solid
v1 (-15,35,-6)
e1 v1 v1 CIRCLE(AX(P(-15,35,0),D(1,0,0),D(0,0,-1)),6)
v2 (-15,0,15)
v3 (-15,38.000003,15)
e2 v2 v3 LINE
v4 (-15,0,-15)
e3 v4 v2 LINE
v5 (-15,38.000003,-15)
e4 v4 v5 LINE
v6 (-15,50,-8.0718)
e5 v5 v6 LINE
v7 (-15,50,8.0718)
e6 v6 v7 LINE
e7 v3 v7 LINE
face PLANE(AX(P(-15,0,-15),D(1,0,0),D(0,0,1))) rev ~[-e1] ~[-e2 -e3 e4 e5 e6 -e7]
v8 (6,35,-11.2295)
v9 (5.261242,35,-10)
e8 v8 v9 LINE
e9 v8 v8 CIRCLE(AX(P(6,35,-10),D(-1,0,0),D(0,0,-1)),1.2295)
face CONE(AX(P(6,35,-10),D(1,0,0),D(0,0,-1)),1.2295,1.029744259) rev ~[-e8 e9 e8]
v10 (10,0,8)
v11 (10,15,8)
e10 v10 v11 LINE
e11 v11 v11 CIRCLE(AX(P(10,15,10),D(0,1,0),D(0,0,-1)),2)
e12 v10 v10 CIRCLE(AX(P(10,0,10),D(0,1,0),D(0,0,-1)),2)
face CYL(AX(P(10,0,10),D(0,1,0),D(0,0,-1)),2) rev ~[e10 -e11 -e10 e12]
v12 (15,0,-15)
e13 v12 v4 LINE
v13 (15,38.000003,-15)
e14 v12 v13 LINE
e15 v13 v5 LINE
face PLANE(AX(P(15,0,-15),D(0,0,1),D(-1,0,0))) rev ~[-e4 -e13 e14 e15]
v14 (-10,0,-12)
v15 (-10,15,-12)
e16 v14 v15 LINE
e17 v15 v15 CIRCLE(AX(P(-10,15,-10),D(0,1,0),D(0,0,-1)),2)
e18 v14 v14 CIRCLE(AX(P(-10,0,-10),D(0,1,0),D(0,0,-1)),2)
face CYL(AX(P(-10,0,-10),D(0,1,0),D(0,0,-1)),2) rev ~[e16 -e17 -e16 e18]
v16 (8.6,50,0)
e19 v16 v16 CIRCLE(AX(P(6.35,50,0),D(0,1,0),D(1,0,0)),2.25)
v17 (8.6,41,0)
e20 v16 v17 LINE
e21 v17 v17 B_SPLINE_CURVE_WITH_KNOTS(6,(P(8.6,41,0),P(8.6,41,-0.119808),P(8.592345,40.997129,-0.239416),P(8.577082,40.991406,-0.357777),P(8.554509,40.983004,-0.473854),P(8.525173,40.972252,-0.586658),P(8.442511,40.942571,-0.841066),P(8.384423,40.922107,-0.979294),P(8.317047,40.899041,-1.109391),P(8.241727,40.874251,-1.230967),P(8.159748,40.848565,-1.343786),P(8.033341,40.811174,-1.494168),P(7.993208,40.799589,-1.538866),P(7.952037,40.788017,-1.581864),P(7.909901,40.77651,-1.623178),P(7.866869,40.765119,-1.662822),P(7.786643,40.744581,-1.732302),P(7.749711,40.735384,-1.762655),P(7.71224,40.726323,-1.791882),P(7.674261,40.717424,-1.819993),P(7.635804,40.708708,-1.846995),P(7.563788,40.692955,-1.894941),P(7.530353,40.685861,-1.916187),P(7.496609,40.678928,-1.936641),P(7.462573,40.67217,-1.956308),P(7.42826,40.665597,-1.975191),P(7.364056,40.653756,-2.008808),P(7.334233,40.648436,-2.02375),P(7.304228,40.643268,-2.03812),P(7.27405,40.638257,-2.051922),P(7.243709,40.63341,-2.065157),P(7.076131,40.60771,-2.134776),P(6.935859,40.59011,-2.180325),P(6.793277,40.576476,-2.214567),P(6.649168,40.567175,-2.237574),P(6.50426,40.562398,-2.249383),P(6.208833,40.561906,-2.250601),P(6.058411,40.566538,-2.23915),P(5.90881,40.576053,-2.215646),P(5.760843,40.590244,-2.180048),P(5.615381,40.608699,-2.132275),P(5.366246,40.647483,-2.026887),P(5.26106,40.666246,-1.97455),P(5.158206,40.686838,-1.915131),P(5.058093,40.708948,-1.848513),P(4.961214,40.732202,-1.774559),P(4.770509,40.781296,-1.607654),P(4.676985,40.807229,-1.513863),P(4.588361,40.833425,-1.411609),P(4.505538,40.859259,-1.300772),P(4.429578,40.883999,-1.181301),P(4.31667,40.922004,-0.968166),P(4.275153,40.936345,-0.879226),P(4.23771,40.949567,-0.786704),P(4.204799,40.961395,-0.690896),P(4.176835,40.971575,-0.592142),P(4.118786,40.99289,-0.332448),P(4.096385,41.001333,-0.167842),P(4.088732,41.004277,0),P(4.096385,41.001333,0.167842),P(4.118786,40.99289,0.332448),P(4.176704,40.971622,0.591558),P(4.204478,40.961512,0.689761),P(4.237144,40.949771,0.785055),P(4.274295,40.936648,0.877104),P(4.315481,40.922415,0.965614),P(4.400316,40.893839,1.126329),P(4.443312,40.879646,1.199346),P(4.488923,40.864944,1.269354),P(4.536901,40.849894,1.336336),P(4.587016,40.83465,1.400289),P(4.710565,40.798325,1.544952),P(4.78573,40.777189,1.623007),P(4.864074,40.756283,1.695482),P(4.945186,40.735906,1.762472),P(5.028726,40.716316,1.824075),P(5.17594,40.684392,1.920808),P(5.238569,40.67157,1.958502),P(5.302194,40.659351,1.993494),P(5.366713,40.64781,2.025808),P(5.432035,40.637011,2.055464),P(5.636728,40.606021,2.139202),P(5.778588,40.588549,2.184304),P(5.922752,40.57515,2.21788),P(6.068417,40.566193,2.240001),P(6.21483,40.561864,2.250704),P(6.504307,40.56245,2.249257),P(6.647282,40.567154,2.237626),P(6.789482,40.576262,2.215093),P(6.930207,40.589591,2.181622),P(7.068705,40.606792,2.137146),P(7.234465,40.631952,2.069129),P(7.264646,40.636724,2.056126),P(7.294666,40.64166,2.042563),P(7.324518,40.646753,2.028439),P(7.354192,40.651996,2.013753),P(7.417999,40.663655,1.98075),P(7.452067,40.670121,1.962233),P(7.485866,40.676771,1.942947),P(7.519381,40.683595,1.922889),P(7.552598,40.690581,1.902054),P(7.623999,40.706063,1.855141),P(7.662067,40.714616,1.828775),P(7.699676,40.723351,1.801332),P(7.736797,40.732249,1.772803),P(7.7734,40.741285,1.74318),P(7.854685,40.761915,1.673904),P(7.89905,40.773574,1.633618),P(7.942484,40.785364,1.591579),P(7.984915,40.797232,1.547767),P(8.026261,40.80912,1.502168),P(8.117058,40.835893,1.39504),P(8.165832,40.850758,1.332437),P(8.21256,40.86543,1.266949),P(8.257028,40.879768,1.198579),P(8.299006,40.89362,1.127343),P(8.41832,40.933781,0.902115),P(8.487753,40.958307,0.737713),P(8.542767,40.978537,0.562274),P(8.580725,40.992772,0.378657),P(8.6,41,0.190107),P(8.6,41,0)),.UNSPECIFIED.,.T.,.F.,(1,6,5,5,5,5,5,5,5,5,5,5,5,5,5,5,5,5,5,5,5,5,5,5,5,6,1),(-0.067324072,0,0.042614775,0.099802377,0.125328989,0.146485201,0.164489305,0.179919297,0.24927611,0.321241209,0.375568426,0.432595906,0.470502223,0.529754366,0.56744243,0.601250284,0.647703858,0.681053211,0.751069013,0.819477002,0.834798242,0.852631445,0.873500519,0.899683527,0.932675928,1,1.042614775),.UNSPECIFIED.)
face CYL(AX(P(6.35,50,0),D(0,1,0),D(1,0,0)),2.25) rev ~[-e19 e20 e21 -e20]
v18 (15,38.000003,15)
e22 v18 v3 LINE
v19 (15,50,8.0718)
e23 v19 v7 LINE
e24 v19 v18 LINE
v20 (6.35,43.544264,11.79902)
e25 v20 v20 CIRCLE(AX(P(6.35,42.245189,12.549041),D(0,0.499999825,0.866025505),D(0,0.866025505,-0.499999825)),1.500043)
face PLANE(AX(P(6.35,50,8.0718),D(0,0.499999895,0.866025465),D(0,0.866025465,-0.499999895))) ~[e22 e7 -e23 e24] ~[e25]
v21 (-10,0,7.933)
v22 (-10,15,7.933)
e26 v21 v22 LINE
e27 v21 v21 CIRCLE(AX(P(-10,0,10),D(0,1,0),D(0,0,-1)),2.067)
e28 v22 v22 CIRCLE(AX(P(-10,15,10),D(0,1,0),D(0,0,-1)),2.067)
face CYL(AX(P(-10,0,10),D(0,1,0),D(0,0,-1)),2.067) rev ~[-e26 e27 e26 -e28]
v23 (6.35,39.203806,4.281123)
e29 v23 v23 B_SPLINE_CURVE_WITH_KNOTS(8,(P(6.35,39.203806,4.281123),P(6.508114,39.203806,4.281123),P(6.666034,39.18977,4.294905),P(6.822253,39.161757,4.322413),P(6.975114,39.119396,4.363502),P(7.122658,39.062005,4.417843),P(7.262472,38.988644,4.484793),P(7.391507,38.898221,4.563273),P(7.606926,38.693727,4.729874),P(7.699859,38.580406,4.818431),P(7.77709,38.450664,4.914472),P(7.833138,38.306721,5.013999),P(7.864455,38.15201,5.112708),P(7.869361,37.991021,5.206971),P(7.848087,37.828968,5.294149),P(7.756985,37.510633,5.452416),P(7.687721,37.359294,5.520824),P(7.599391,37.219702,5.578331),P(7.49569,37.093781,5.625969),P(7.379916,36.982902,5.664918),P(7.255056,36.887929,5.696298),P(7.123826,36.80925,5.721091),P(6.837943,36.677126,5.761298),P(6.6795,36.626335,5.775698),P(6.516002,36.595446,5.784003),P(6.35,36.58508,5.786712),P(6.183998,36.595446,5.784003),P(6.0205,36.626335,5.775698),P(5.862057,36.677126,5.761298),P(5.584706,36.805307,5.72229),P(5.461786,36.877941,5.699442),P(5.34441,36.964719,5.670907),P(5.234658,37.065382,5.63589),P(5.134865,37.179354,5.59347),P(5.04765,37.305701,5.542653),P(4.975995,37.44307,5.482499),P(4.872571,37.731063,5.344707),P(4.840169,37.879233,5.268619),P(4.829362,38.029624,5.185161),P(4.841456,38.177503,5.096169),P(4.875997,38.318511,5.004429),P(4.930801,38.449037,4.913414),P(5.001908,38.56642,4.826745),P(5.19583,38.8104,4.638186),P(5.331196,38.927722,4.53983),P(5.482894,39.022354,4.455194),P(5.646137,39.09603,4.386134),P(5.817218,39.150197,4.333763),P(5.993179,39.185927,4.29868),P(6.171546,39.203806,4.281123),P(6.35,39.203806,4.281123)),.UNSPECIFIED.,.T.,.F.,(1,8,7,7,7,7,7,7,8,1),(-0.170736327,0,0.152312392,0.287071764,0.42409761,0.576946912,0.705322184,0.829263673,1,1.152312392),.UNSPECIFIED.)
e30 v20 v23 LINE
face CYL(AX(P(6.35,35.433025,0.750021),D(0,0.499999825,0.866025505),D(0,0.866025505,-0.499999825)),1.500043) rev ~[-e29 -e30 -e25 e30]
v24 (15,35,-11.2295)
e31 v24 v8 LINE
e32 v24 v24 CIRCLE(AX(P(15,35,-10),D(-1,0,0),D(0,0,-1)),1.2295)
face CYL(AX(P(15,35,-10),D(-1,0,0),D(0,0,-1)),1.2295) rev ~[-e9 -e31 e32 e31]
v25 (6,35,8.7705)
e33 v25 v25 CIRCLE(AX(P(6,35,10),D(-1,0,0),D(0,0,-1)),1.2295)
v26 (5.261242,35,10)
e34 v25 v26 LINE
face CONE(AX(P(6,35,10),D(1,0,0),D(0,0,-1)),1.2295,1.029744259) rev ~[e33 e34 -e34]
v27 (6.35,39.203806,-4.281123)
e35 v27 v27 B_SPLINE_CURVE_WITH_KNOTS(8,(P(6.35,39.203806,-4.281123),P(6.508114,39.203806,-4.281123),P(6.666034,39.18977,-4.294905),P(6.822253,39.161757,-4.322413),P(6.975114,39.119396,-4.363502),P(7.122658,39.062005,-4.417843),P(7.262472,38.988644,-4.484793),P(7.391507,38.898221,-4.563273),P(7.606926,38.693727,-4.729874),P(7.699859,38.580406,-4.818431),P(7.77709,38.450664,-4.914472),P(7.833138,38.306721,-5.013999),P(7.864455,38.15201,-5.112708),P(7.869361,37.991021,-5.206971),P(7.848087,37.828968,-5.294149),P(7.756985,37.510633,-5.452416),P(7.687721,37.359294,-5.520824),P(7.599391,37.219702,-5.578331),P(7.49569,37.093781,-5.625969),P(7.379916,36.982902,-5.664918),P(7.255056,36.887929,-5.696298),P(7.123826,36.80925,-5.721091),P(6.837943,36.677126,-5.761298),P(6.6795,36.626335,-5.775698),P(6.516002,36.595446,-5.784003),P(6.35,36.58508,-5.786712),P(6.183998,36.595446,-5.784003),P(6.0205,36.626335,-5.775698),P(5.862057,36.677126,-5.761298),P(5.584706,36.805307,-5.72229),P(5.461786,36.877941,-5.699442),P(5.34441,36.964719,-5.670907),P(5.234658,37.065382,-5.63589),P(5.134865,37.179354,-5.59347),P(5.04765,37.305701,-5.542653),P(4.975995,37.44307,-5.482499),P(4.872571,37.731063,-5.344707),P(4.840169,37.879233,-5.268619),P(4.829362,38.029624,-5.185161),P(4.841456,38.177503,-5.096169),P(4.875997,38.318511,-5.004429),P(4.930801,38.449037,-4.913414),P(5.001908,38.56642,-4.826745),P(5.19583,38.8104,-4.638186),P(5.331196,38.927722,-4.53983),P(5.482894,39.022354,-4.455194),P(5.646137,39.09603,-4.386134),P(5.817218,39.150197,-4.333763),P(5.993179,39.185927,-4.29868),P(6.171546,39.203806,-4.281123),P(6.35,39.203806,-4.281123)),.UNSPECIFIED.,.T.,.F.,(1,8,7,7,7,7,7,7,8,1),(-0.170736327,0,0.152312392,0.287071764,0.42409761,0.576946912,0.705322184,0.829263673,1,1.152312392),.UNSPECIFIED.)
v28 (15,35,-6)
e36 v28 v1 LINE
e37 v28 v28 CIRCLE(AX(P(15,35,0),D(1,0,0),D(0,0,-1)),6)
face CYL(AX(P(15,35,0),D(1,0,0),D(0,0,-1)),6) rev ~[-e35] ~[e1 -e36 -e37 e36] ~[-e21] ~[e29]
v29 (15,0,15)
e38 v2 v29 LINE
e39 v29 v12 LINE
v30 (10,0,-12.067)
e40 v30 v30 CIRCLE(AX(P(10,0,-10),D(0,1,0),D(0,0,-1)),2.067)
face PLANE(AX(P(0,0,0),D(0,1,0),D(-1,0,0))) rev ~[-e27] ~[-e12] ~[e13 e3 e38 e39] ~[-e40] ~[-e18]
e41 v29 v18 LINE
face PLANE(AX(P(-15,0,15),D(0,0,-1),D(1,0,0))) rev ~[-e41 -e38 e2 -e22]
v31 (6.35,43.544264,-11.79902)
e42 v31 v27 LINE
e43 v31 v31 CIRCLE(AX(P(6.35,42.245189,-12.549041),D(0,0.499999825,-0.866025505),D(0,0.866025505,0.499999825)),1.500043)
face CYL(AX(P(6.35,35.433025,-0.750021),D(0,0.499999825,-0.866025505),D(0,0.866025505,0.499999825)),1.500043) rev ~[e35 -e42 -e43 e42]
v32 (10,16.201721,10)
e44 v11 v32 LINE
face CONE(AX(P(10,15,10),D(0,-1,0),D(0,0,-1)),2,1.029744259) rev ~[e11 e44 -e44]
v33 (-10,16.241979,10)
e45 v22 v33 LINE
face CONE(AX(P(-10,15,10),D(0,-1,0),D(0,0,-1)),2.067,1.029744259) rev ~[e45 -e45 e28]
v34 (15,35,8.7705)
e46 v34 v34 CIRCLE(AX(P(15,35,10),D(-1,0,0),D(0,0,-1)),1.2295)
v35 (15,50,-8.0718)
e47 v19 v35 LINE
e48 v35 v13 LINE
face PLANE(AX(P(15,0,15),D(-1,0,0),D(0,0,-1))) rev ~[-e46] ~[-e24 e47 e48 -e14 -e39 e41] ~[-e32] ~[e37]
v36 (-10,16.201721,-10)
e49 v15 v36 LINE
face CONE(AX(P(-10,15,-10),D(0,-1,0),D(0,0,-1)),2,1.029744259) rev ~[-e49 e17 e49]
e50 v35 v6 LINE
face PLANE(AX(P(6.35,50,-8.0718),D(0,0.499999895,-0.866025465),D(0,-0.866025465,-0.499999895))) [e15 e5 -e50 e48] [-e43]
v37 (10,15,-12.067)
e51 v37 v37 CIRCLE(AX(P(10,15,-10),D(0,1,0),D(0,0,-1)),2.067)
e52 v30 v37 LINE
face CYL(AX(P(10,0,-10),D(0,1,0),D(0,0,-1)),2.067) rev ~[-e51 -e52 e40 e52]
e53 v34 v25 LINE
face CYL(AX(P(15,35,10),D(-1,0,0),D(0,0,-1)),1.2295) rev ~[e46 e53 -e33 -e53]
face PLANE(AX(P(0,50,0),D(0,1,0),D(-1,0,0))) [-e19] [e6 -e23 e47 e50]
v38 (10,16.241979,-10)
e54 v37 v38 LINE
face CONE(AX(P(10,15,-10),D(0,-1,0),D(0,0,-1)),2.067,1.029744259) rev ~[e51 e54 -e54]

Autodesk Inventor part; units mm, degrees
ref_plane "XZ Plane" through (0, 0, 0) normal (0, 1, 0) x (-1, 0, 0)
ref_plane "XY Plane" through (0, 0, 0) normal (0, 0, 1) x (1, 0, 0)
sketch "Sketch1" plane through (0, 0, 0) normal (0, 1, 0) x (-1, 0, 0)
  line L0 (-15, -15) -> (15, -15)
  line L1 (15, -15) -> (15, 15)
  line L2 (15, 15) -> (-15, 15)
  line L3 (-15, 15) -> (-15, -15)
  line L4 (-15, -15) -> (15, 15) construction
  line L5 (15, -15) -> (-15, 15) construction
  point P0 (0, 0)
  dimension "d0" = 30
  dimension "d1" = 30
extrude "Extrusion1" add sketch "Sketch1" along normal blind 50
sketch "Sketch2" plane through (15, 0, 15) normal (1, 0, 0) x (0, 0, -1)
  line L0 (15, 0) -> (15, 35) construction
  line L1 (0, 0) -> (30, 0) projected
  circle A0 centre (15, 35) radius 6
  dimension "d4" = 35
  dimension "d6" = 12
extrude "Extrusion2" cut sketch "Sketch2" against normal through all
sketch "Sketch7" plane through (0, 50, 0) normal (0, 1, 0) x (1, 0, 0)
  line L0 (15, -15) -> (15, 15) projected
  line L1 (6.5, 0) -> (6.35, 0)
  circle A0 centre (6.35, 0) radius 2.25
  point P0 (0, 0)
  dimension "d33" = 4.5
  dimension "d119" = 8.65
extrude "Extrusion7" cut sketch "Sketch7" against normal blind 12
ref_plane "Work Plane1" through (6.35, 0, 0) normal (1, 0, 0) x (0, 1, 0)
sketch "Sketch14" plane through (6.35, 0, 0) normal (1, 0, 0) x (0, 1, 0)
  line L0 (50, -15) -> (50, 15) projected
  circle A0 centre (35, 0) radius 6 projected
  line L1 (50, 0) -> (35, 0)
  line L2 (35, 0) -> (52.3205, -30)
  line L3 (35, 0) -> (61.673, 0)
  line L4 (35, 0) -> (36.7321, 0)
  line L5 (36.7321, 0) -> (54.0526, -30)
  line L6 (54.0526, -30) -> (52.3205, -30)
  line L7 (52, -6.9171) -> (34.5359, -17)
  line L8 (34.5359, -17) -> (52, -17)
  line L9 (52, -17) -> (52, -6.9171)
  line L10 (0, -15) -> (50, -15) projected
  line L11 (0, -15) -> (50, -15) projected
  point P0 (0, 0)
  point P1 (36.7321, 0)
  point P2 (38, -15)
  dimension "d55" = 60
  dimension "d57" = 120
  dimension "d72" = 1.5
  dimension "d73" = 30
  dimension "d112" = 2
  dimension "d113" = 2
  dimension "d114" = 12
revolve "Revolution1" cut sketch "Sketch14" angle 360 about axis through (6.35, 35, 0) along (0, 0.5, -0.8660254) contours L10 L2 L7 L5 | L5 L8 L2 L10 | L7 L2 A0 L5 | L5 L6 L2 L8 | A0 L2 L1 L5
extrude "Extrusion11" cut sketch "Sketch14" along normal blind 99 and the other way blind 99 contours L10 L5 L7 L0 | L0 L7 L9 L8 L5 L10 | L10 L2 L7 L5 | L5 L8 L2 L10 | L10 L7 L2 | L2 L8 L7 L10
mirror "Mirror4" about plane through (0, 0, 0) normal (0, 0, 1) of "Revolution1", "Extrusion11"
sketch "Sketch19" plane through (0, 0, 0) normal (0, -1, 0) x (1, 0, 0)
  point P0 (0, 0)
  point P1 (-10, 10)
  point P2 (10, -10)
  dimension "d97" = 10
  dimension "d98" = 10
  dimension "d99" = 10
  dimension "d100" = 10
hole "Hole2" at (-10, 0, 10) at (10, 0, -10) direction (0, 1, 0) diameter 4.134 depth 15 tip angle 118 thread size "M5x0.8" class "6H" standard "ISO Metric profile"
sketch "Sketch20" plane through (0, 0, 0) normal (0, -1, 0) x (1, 0, 0)
  point P0 (0, 0)
  point P1 (10, 10)
  point P2 (-10, -10)
  dimension "d108" = 10
  dimension "d109" = 10
  dimension "d110" = 10
  dimension "d111" = 10
hole "Hole3" at (10, 0, 10) at (-10, 0, -10) direction (0, 1, 0) diameter 4 depth 15 tip angle 118
sketch "Sketch21" plane through (15, 0, 15) normal (1, 0, 0) x (0, 0, -1)
  line L0 (0, 0) -> (30, 0) projected
  circle A0 centre (15, 35) radius 6 projected
  point P0 (15, 0)
  point P1 (5, 35)
  point P2 (25, 35)
  point P3 (15, 0)
  point P4 (15, 0)
  dimension "d127" = 10
  dimension "d128" = 10
hole "Hole4" at (15, 35, 10) at (15, 35, -10) direction (-1, 0, 0) diameter 2.459 depth 9 tip angle 118 thread size "M3x0.5" class "6H" standard "ISO Metric profile"
equation "\"d99\" = d98"
equation "\"d100\" = d97"
equation "\"d110\" = d109"
equation "\"d111\" = d108"
properties part number "23-0064 Diode holder" material "Stainless Steel 316 (X5CrNiMo17.12.2)"
